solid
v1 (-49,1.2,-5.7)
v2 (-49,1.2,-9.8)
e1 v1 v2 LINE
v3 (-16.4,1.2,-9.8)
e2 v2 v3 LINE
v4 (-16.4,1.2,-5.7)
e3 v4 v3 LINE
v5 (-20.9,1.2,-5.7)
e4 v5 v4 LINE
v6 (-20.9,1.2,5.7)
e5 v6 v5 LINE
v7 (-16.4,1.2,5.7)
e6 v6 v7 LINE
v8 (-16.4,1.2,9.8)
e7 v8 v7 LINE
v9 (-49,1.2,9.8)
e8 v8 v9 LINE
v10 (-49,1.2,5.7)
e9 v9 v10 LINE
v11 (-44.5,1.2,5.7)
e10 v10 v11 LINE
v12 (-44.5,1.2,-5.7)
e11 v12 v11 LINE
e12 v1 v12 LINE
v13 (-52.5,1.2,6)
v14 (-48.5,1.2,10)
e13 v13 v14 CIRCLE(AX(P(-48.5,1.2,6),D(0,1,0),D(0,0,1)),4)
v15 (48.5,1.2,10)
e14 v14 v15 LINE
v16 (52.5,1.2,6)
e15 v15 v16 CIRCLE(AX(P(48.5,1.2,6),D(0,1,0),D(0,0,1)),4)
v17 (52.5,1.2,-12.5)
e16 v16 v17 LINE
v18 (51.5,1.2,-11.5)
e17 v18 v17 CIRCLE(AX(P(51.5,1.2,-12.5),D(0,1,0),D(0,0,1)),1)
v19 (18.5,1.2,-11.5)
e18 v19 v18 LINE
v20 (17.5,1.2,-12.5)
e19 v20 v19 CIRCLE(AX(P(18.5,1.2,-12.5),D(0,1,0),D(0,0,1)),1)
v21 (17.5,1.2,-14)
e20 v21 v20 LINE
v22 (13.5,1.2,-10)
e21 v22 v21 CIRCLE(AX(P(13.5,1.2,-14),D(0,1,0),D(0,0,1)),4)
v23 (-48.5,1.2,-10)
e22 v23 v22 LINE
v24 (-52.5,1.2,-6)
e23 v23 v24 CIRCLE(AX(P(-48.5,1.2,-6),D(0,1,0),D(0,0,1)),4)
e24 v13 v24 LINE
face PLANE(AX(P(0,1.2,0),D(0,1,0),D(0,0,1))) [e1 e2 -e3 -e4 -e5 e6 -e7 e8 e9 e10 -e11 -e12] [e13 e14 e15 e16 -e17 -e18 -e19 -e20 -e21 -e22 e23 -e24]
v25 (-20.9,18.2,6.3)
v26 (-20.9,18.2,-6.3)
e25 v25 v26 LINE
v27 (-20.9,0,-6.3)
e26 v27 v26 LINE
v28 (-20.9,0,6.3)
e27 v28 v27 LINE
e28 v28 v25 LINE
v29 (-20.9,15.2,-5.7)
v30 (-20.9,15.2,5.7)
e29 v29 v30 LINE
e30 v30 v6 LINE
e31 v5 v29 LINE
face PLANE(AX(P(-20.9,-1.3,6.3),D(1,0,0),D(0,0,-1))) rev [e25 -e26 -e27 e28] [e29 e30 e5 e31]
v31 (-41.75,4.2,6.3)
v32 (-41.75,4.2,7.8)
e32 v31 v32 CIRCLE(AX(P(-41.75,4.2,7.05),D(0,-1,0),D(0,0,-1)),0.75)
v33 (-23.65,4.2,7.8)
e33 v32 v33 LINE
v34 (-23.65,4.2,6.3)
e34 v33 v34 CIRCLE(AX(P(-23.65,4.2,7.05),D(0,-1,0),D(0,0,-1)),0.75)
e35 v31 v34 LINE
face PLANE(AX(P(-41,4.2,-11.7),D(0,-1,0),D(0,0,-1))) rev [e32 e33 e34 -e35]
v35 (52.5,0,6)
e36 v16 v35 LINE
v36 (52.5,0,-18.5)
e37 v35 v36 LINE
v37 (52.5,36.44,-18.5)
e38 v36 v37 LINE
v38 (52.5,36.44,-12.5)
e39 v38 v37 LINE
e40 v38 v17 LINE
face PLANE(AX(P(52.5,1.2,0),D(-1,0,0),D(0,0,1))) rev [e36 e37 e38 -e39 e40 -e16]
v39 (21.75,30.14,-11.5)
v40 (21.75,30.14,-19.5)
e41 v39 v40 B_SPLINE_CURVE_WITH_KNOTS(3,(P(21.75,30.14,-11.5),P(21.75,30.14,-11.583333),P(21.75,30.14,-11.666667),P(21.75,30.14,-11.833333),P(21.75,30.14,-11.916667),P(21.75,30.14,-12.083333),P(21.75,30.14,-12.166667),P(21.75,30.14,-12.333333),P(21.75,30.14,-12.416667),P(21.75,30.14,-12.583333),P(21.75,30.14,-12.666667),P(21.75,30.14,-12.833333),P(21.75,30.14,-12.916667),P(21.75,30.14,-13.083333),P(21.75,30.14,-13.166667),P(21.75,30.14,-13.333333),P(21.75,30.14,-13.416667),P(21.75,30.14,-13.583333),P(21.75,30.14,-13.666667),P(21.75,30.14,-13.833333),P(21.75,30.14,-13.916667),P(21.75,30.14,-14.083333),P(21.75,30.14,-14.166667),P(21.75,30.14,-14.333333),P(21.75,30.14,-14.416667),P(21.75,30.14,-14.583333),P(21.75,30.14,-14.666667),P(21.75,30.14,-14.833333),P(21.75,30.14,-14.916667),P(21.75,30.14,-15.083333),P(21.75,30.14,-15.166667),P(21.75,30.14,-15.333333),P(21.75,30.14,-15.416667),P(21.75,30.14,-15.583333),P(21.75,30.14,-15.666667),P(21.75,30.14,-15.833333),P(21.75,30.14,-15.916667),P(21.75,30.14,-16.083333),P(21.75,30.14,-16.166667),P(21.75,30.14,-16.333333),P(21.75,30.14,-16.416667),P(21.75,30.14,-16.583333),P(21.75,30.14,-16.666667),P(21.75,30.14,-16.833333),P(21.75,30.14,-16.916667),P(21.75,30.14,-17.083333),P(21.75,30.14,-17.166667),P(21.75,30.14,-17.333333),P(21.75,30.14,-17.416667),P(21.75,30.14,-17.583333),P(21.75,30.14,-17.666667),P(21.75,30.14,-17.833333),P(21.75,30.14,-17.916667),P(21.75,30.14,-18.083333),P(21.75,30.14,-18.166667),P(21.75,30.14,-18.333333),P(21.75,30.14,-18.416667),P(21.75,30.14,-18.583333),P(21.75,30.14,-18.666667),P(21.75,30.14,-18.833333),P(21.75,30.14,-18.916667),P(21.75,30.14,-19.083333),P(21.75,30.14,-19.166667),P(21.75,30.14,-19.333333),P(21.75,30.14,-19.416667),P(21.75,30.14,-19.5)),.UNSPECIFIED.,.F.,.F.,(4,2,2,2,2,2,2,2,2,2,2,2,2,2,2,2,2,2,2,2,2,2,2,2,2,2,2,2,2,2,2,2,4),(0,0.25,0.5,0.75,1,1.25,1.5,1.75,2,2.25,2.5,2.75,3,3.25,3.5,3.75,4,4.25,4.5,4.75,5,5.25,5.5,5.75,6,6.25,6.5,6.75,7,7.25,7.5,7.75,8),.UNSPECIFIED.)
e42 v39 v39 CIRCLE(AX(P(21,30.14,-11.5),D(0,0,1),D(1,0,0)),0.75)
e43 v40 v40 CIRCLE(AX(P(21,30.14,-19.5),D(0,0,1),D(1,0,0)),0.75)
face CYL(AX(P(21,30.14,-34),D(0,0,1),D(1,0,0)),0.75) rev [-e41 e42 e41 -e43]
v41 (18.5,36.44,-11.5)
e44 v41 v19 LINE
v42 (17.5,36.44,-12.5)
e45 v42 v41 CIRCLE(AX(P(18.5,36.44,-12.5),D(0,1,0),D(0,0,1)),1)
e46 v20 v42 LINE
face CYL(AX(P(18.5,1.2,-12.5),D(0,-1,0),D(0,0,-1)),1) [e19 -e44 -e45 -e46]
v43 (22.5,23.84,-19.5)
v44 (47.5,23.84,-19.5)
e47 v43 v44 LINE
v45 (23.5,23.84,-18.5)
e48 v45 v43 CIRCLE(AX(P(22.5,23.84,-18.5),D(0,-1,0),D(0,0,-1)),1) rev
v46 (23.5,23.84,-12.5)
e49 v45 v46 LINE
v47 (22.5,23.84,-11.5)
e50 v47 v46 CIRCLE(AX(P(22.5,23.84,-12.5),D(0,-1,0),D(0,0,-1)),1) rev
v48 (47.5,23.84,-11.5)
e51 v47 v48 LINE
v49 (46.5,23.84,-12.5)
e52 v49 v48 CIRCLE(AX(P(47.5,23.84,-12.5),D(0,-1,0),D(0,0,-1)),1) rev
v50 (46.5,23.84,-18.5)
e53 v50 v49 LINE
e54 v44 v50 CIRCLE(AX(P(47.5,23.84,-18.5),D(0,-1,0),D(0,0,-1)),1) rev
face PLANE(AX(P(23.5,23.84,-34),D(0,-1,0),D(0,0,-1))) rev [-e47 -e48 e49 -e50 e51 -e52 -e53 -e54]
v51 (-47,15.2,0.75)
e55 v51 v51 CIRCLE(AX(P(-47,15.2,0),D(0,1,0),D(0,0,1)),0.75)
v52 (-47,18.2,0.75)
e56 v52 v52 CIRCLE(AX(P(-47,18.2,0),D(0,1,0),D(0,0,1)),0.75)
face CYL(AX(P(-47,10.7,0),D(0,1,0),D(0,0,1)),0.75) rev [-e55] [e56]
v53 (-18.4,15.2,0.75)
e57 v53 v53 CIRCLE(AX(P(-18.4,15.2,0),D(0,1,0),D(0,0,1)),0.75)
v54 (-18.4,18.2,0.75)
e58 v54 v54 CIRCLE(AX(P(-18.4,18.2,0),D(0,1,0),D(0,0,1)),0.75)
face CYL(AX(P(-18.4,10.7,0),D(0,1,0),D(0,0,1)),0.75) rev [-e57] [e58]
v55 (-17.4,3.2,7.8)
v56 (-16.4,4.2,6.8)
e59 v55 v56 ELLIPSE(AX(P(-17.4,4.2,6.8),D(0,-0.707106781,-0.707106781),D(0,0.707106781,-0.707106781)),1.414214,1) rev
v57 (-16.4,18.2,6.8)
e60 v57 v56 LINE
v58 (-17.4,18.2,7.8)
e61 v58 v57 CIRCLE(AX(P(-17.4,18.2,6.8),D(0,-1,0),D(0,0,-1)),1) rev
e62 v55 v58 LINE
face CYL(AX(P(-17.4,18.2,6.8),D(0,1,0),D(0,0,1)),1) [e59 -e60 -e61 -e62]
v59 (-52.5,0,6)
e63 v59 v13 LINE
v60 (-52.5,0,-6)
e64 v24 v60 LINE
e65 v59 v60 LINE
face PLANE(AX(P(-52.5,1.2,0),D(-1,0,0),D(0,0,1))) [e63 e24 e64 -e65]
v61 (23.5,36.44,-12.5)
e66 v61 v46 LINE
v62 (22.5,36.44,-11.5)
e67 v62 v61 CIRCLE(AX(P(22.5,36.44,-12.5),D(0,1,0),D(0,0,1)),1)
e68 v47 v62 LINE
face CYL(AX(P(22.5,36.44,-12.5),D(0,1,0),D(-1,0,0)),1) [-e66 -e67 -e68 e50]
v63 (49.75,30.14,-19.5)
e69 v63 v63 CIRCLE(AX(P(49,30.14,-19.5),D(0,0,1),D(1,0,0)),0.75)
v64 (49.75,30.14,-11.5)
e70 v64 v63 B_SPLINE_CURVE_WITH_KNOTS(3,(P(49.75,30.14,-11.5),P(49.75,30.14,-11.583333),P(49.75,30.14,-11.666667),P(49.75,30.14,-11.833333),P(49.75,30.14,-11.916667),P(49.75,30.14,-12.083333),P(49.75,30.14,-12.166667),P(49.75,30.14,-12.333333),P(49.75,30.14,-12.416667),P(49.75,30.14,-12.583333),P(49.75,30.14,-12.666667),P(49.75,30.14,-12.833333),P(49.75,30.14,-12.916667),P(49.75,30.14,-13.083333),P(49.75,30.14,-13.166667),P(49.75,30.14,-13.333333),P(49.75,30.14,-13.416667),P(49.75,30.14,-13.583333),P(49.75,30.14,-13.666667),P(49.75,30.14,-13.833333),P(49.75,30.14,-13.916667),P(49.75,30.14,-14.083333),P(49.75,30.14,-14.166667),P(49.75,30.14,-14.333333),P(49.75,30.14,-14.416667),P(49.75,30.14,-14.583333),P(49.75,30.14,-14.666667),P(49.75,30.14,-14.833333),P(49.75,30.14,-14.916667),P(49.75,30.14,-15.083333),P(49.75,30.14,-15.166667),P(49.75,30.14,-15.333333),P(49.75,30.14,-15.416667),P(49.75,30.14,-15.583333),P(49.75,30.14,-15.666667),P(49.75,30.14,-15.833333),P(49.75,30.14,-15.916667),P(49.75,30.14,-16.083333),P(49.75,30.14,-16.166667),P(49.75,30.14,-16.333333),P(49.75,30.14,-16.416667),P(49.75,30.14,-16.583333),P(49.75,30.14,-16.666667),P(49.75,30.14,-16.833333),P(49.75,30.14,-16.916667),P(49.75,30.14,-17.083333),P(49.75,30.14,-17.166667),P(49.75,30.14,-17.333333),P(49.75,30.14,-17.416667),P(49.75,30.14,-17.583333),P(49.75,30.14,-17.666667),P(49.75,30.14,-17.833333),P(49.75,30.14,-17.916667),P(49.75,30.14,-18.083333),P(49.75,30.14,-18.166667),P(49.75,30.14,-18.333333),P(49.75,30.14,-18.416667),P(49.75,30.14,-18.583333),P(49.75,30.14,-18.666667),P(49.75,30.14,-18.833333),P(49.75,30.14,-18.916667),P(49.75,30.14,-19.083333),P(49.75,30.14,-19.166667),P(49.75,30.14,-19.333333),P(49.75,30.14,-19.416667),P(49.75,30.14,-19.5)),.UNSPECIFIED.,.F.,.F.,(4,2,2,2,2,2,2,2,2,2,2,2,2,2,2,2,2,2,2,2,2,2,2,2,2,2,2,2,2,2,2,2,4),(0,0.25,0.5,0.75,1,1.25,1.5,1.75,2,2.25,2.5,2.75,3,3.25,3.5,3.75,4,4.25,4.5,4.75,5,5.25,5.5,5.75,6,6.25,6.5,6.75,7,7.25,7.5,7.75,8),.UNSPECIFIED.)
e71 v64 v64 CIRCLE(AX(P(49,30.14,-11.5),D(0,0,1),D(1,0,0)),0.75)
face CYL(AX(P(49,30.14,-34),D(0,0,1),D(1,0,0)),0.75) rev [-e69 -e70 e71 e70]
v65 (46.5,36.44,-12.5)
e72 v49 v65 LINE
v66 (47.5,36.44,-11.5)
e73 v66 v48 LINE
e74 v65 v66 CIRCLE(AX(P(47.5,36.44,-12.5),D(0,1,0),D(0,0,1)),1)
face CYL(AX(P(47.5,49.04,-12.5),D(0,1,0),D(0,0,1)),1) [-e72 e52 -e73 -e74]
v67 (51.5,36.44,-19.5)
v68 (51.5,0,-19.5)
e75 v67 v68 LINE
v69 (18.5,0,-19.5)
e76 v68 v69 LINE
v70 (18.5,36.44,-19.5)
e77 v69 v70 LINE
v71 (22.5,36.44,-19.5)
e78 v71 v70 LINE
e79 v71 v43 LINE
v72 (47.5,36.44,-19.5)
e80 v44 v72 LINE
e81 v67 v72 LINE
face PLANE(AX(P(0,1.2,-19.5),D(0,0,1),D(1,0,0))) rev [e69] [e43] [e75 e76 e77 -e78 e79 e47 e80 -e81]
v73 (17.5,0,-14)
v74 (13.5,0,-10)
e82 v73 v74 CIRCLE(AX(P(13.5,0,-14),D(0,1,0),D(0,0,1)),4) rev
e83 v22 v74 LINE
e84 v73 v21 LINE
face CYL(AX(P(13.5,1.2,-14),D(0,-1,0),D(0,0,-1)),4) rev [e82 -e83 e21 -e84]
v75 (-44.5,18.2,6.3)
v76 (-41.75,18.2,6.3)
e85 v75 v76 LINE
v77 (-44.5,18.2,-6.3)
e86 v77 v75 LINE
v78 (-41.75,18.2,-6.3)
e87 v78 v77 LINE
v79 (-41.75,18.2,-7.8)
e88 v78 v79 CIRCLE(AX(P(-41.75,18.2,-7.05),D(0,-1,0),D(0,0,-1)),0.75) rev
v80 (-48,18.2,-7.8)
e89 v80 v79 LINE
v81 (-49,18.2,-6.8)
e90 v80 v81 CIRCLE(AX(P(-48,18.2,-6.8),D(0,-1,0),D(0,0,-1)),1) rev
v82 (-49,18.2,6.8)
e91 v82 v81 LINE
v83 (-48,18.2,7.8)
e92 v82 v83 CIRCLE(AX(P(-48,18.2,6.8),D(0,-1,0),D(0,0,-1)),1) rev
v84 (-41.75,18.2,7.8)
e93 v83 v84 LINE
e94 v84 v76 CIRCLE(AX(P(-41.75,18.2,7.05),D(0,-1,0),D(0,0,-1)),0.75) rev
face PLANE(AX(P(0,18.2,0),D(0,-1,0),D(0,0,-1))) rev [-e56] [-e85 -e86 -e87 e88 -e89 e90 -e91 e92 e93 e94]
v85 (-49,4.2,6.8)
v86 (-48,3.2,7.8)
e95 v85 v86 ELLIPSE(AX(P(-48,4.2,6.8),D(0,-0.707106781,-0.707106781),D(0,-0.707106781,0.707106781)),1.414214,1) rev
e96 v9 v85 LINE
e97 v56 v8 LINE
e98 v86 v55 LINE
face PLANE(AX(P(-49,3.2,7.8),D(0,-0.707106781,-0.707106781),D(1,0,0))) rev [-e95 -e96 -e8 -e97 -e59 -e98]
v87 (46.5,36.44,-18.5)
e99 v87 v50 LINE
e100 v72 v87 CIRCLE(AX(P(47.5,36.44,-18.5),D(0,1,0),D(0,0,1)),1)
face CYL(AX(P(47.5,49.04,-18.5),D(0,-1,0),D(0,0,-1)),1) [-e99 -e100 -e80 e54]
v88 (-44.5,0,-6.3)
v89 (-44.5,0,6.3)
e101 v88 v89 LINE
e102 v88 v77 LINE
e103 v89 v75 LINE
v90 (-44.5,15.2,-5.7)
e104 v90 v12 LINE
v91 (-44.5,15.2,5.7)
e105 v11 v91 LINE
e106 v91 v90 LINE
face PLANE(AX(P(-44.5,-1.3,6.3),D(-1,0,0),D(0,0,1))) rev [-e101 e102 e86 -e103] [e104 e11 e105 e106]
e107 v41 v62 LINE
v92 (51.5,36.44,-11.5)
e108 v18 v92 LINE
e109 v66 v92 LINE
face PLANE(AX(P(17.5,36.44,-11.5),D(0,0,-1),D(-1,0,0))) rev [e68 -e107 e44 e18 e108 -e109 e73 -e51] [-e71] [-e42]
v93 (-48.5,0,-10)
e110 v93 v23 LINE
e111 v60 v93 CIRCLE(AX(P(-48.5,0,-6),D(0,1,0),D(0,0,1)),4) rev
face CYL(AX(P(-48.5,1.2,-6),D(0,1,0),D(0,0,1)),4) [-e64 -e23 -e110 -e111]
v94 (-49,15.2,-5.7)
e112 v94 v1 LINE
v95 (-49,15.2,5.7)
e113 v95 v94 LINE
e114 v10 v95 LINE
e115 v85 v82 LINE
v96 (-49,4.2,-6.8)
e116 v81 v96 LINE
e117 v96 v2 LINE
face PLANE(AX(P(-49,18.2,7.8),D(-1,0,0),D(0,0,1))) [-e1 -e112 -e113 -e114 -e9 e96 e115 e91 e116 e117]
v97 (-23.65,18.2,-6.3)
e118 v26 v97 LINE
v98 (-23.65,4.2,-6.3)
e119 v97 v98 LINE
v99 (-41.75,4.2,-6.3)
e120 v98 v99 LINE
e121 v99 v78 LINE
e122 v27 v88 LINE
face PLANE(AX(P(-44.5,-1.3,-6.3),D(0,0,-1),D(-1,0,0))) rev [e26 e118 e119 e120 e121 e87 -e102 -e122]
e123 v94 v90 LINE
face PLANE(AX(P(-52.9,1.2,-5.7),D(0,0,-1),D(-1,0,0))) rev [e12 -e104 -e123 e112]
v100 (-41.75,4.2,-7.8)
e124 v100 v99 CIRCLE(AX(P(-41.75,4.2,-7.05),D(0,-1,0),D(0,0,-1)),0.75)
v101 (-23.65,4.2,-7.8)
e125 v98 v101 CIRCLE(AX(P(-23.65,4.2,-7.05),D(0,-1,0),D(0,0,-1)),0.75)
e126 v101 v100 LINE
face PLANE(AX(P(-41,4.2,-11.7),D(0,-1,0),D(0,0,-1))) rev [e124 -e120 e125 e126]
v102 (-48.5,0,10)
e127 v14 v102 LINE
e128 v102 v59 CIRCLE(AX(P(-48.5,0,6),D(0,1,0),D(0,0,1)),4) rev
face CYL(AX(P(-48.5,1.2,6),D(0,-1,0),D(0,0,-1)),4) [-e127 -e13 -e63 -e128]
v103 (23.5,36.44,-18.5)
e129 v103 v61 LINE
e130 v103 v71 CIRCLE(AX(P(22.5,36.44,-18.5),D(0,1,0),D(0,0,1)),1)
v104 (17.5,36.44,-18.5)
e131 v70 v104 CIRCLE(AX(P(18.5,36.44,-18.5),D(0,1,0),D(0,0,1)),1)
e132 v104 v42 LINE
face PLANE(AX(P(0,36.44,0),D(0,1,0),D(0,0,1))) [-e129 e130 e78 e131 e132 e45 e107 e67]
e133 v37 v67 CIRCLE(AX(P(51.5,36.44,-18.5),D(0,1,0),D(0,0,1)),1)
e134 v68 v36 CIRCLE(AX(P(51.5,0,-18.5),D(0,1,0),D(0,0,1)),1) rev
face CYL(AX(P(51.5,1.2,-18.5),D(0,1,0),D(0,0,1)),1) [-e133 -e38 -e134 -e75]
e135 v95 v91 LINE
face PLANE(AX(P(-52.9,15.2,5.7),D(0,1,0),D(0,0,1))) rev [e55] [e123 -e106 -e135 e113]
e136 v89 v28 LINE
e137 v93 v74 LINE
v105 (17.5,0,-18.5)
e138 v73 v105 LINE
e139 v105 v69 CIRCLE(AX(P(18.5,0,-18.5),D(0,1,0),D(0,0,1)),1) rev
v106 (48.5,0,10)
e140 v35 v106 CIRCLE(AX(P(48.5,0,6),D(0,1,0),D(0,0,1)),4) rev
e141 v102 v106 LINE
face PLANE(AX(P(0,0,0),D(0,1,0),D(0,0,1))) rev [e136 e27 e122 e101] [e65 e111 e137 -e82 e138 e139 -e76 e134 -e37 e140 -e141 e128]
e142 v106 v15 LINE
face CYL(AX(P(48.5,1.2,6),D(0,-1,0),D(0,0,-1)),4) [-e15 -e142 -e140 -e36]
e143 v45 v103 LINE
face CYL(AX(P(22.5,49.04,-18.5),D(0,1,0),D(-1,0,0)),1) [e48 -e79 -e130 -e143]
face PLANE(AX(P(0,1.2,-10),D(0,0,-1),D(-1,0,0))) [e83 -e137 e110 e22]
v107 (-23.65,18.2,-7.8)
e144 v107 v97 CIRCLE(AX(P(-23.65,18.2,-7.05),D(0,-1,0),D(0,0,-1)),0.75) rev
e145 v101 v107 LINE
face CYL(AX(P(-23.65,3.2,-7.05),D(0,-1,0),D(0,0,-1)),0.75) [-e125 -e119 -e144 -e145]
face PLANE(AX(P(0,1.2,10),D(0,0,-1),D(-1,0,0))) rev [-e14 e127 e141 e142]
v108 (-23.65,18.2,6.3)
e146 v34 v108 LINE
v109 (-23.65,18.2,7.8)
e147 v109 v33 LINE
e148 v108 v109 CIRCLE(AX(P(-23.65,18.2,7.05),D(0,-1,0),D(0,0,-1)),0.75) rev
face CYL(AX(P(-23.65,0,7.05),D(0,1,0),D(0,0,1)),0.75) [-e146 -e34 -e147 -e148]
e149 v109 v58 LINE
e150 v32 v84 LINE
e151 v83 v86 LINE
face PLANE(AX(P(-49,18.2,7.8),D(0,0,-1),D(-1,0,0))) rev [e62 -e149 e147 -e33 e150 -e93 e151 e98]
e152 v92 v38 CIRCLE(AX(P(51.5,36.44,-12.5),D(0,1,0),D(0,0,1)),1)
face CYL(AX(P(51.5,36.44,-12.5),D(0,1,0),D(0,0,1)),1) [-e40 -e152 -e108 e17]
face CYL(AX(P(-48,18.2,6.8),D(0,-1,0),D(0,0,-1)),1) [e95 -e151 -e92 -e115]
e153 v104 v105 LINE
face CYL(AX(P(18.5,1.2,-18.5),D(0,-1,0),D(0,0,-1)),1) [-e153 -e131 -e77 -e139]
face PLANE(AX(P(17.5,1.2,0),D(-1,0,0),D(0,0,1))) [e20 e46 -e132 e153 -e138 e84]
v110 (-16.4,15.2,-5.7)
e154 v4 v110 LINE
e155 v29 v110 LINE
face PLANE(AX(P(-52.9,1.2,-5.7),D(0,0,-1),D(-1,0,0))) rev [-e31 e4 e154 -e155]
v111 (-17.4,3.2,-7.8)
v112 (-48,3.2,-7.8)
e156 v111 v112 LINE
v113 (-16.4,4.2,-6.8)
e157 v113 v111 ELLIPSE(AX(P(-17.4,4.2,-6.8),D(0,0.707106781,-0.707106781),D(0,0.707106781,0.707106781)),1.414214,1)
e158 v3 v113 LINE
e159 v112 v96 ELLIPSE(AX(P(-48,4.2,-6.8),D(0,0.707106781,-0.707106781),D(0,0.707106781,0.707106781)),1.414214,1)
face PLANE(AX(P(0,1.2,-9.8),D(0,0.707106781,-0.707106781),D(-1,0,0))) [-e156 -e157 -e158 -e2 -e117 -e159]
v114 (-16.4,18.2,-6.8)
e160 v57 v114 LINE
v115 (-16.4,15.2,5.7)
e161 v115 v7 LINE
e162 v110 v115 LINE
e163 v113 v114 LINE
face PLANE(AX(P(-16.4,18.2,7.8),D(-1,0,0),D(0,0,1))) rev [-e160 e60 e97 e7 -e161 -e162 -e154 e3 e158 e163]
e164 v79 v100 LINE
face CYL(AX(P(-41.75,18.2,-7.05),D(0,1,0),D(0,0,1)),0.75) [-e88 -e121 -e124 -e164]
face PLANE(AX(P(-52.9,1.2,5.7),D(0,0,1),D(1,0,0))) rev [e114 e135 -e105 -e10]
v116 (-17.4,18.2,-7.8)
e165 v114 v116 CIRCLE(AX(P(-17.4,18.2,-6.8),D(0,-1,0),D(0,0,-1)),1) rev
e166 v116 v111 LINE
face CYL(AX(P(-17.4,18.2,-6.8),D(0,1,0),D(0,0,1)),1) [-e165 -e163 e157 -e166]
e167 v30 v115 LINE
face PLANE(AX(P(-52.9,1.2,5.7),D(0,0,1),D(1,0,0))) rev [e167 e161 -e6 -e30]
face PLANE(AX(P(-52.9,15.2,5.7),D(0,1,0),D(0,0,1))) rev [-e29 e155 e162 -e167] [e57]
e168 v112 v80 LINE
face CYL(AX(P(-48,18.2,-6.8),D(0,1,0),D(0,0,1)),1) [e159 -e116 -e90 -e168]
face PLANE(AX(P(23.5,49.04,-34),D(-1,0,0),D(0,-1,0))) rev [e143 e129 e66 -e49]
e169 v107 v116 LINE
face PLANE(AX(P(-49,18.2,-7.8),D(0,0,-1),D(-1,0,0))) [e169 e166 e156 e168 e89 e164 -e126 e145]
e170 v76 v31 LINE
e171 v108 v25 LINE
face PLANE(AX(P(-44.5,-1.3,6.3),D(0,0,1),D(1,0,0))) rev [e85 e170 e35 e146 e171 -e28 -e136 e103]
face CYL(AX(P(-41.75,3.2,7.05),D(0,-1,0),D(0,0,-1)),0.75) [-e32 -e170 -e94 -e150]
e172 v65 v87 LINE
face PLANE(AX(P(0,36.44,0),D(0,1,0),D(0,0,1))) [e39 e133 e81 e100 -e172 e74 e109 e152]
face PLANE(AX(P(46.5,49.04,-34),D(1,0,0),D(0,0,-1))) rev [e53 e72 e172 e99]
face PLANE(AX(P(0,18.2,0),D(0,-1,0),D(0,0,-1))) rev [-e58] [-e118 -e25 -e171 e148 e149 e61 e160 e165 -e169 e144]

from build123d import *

# Parameters (mm, degrees)
ESBO_O1_W                = 35
ESBO_O1_H                = 9.5
ESBO_O1_W_2              = 105
ESBO_O1_H_2              = 20
BASE_DEPTH               = 1.2
ESBO_O2_W                = 32.6
ESBO_O2_H                = 15.6
SUPORTE_1_DEPTH          = 17
ESBO_O3_W                = 23.6
ESBO_O3_H                = 12.6
CORTE_EXTRUS_O1_DEPTH    = 19.5
ESBO_O4_W                = 16.6
ESBO_O4_H                = 17.237895569
CORTE_EXTRUS_O2_DEPTH    = 19.5
ESBO_O5_W                = 11.4
ESBO_O5_H                = 14
CORTE_EXTRUS_O3_DEPTH    = 36.5
ESBO_O6_R                = 0.75
CORTE_EXTRUS_O4_DEPTH    = 7.5
ESBO_O7_W                = 35
ESBO_O7_H                = 8
RESSALTO_EXTRUS_O3_DEPTH = 35.24
ESBO_O9_W                = 23
ESBO_O9_H                = 25.2
CORTE_EXTRUS_O5_DEPTH    = 22.5
ESBO_O10_R               = 0.75
CORTE_EXTRUS_O6_DEPTH    = 22.5
CHANFRO1_SIZE            = 2
CHANFRO2_SIZE            = 2
FILETE1_R                = 1
FILETE2_R                = 1
FILETE3_R                = 1
FILETE4_R                = 1
FILETE5_R                = 1
FILETE6_R                = 1
FILETE7_R                = 1
FILETE8_R                = 1
FILETE9_RADIUS           = 0.75
FILETE9_LENGTH           = 14
FILETE10_RADIUS          = 0.75
FILETE10_LENGTH          = 14
FILETE11_RADIUS          = 0.75
FILETE11_LENGTH          = 14
FILETE12_RADIUS          = 0.75
FILETE12_LENGTH          = 14
FILETE13_R               = 1
FILETE14_R               = 1
FILETE15_R               = 1
FILETE16_R               = 1
FILETE17_R               = 4
FILETE18_R               = 4
FILETE19_R               = 4
FILETE20_R               = 4


with BuildPart() as part:
    # Esboço1 → Base (new body)
    with BuildSketch(Plane(origin=(0, 0, 0), x_dir=(1, 0, 0), z_dir=(0, 1, 0))):
        with Locations((35, 14.75)):
            Rectangle(ESBO_O1_W, ESBO_O1_H)
        Rectangle(ESBO_O1_W_2, ESBO_O1_H_2)
    extrude(amount=BASE_DEPTH)

    # Esboço2 → Suporte 1 (add)
    with BuildSketch(Plane(origin=(0, 1.2, 0), x_dir=(1, 0, 0), z_dir=(0, 1, 0))):
        with Locations((-32.7, 0)):
            Rectangle(ESBO_O2_W, ESBO_O2_H)
    extrude(amount=SUPORTE_1_DEPTH)

    # Esboço3 → Corte-extrusão1 (cut)
    with BuildSketch(Plane(origin=(0, 18.2, 0), x_dir=(1, 0, 0), z_dir=(0, 1, 0))):
        with Locations((-32.7, 0)):
            Rectangle(ESBO_O3_W, ESBO_O3_H)
    extrude(amount=-CORTE_EXTRUS_O1_DEPTH, mode=Mode.SUBTRACT)

    # Esboço4 → Corte-extrusão2 (cut)
    with BuildSketch(Plane.XY.offset(7.8)):
        with Locations((-32.7, 12.818947785)):
            Rectangle(ESBO_O4_W, ESBO_O4_H)
    extrude(amount=-CORTE_EXTRUS_O2_DEPTH, mode=Mode.SUBTRACT)

    # Esboço5 → Corte-extrusão3 (cut)
    with BuildSketch(Plane(origin=(-16.4, 0, 0), x_dir=(0, 0, -1), z_dir=(1, 0, 0))):
        with Locations((0, 8.2)):
            Rectangle(ESBO_O5_W, ESBO_O5_H)
    extrude(amount=-CORTE_EXTRUS_O3_DEPTH, mode=Mode.SUBTRACT)

    # Esboço6 → Corte-extrusão4 (cut)
    with BuildSketch(Plane(origin=(0, 18.2, 0), x_dir=(1, 0, 0), z_dir=(0, 1, 0))):
        with Locations(Location((-47, 0, 0), (0, 0, 270))):
            Circle(ESBO_O6_R)
        with Locations(Location((-18.4, 0, 0), (0, 0, 270))):
            Circle(ESBO_O6_R)
    extrude(amount=-CORTE_EXTRUS_O4_DEPTH, mode=Mode.SUBTRACT)

    # Esboço7 → Ressalto-extrusão3 (add)
    with BuildSketch(Plane(origin=(0, 1.2, 0), x_dir=(1, 0, 0), z_dir=(0, 1, 0))):
        with Locations((35, 15.5)):
            Rectangle(ESBO_O7_W, ESBO_O7_H)
    extrude(amount=RESSALTO_EXTRUS_O3_DEPTH)

    # Esboço9 → Corte-extrusão5 (cut)
    with BuildSketch(Plane.XY.offset(-11.5)):
        with Locations((35, 36.44)):
            Rectangle(ESBO_O9_W, ESBO_O9_H)
    extrude(amount=-CORTE_EXTRUS_O5_DEPTH, mode=Mode.SUBTRACT)

    # Esboço10 → Corte-extrusão6 (cut)
    with BuildSketch(Plane.XY.offset(-11.5)):
        with Locations((21, 30.14)):
            Circle(ESBO_O10_R)
        with Locations((49, 30.14)):
            Circle(ESBO_O10_R)
    extrude(amount=-CORTE_EXTRUS_O6_DEPTH, mode=Mode.SUBTRACT)

    # Chanfro1
    chanfro1_edges = [part.edges().sort_by_distance(p)[0] for p in [
        (-32.7, 1.2, 7.8),
    ]]
    chamfer(chanfro1_edges, length=CHANFRO1_SIZE)

    # Chanfro2
    chanfro2_edges = [part.edges().sort_by_distance(p)[0] for p in [
        (-32.7, 1.2, -7.8),
    ]]
    chamfer(chanfro2_edges, length=CHANFRO2_SIZE)

    # Filete1
    filete1_edges = [part.edges().sort_by_distance(p)[0] for p in [
        (52.5, 18.22, -19.5),
    ]]
    fillet(filete1_edges, radius=FILETE1_R)

    # Filete2
    filete2_edges = [part.edges().sort_by_distance(p)[0] for p in [
        (17.5, 18.22, -19.5),
    ]]
    fillet(filete2_edges, radius=FILETE2_R)

    # Filete3
    filete3_edges = [part.edges().sort_by_distance(p)[0] for p in [
        (23.5, 30.14, -19.5),
    ]]
    fillet(filete3_edges, radius=FILETE3_R)

    # Filete4
    filete4_edges = [part.edges().sort_by_distance(p)[0] for p in [
        (46.5, 30.14, -19.5),
    ]]
    fillet(filete4_edges, radius=FILETE4_R)

    # Filete5
    filete5_edges = [part.edges().sort_by_distance(p)[0] for p in [
        (52.5, 18.82, -11.5),
    ]]
    fillet(filete5_edges, radius=FILETE5_R)

    # Filete6
    filete6_edges = [part.edges().sort_by_distance(p)[0] for p in [
        (17.5, 18.82, -11.5),
    ]]
    fillet(filete6_edges, radius=FILETE6_R)

    # Filete7
    filete7_edges = [part.edges().sort_by_distance(p)[0] for p in [
        (46.5, 30.14, -11.5),
    ]]
    fillet(filete7_edges, radius=FILETE7_R)

    # Filete8
    filete8_edges = [part.edges().sort_by_distance(p)[0] for p in [
        (23.5, 30.14, -11.5),
    ]]
    fillet(filete8_edges, radius=FILETE8_R)

    # Filete9: full round fillet: the end face becomes a half cylinder, R = half its width
    filete9_face = Plane((-41, 11.2, 7.05), x_dir=(0, -1, 0), z_dir=(1, 0, 0))  # on the end face: x along it, z out of the body
    filete9_slab = filete9_face.offset(-FILETE9_RADIUS / 2) * Box(FILETE9_LENGTH, 2 * FILETE9_RADIUS, FILETE9_RADIUS, mode=Mode.PRIVATE)  # the body's end, R deep
    filete9_round = Plane((-41.75, 11.2, 7.05), x_dir=(1, 0, 0), z_dir=(0, -1, 0)) * Cylinder(FILETE9_RADIUS, FILETE9_LENGTH, mode=Mode.PRIVATE)  # its axis R under the face
    add(filete9_slab - filete9_round, mode=Mode.SUBTRACT)

    # Filete10: full round fillet: the end face becomes a half cylinder, R = half its width
    filete10_face = Plane((-41, 11.2, -7.05), x_dir=(0, -1, 0), z_dir=(1, 0, 0))  # on the end face: x along it, z out of the body
    filete10_slab = filete10_face.offset(-FILETE10_RADIUS / 2) * Box(FILETE10_LENGTH, 2 * FILETE10_RADIUS, FILETE10_RADIUS, mode=Mode.PRIVATE)  # the body's end, R deep
    filete10_round = Plane((-41.75, 11.2, -7.05), x_dir=(1, 0, 0), z_dir=(0, -1, 0)) * Cylinder(FILETE10_RADIUS, FILETE10_LENGTH, mode=Mode.PRIVATE)  # its axis R under the face
    add(filete10_slab - filete10_round, mode=Mode.SUBTRACT)

    # Filete11: full round fillet: the end face becomes a half cylinder, R = half its width
    filete11_face = Plane((-24.4, 11.2, 7.05), x_dir=(0, 1, 0), z_dir=(-1, 0, 0))  # on the end face: x along it, z out of the body
    filete11_slab = filete11_face.offset(-FILETE11_RADIUS / 2) * Box(FILETE11_LENGTH, 2 * FILETE11_RADIUS, FILETE11_RADIUS, mode=Mode.PRIVATE)  # the body's end, R deep
    filete11_round = Plane((-23.65, 11.2, 7.05), x_dir=(-1, 0, 0), z_dir=(0, 1, 0)) * Cylinder(FILETE11_RADIUS, FILETE11_LENGTH, mode=Mode.PRIVATE)  # its axis R under the face
    add(filete11_slab - filete11_round, mode=Mode.SUBTRACT)

    # Filete12: full round fillet: the end face becomes a half cylinder, R = half its width
    filete12_face = Plane((-24.4, 11.2, -7.05), x_dir=(0, 1, 0), z_dir=(-1, 0, 0))  # on the end face: x along it, z out of the body
    filete12_slab = filete12_face.offset(-FILETE12_RADIUS / 2) * Box(FILETE12_LENGTH, 2 * FILETE12_RADIUS, FILETE12_RADIUS, mode=Mode.PRIVATE)  # the body's end, R deep
    filete12_round = Plane((-23.65, 11.2, -7.05), x_dir=(-1, 0, 0), z_dir=(0, 1, 0)) * Cylinder(FILETE12_RADIUS, FILETE12_LENGTH, mode=Mode.PRIVATE)  # its axis R under the face
    add(filete12_slab - filete12_round, mode=Mode.SUBTRACT)

    # Filete13
    filete13_edges = [part.edges().sort_by_distance(p)[0] for p in [
        (-49, 10.7, -7.8),
    ]]
    fillet(filete13_edges, radius=FILETE13_R)

    # Filete14
    filete14_edges = [part.edges().sort_by_distance(p)[0] for p in [
        (-49, 10.7, 7.8),
    ]]
    fillet(filete14_edges, radius=FILETE14_R)

    # Filete15
    filete15_edges = [part.edges().sort_by_distance(p)[0] for p in [
        (-16.4, 10.7, 7.8),
    ]]
    fillet(filete15_edges, radius=FILETE15_R)

    # Filete16
    filete16_edges = [part.edges().sort_by_distance(p)[0] for p in [
        (-16.4, 10.7, -7.8),
    ]]
    fillet(filete16_edges, radius=FILETE16_R)

    # Filete17
    filete17_edges = [part.edges().sort_by_distance(p)[0] for p in [
        (-52.5, 0.6, 10),
    ]]
    fillet(filete17_edges, radius=FILETE17_R)

    # Filete18
    filete18_edges = [part.edges().sort_by_distance(p)[0] for p in [
        (-52.5, 0.6, -10),
    ]]
    fillet(filete18_edges, radius=FILETE18_R)

    # Filete19
    filete19_edges = [part.edges().sort_by_distance(p)[0] for p in [
        (52.5, 0.6, 10),
    ]]
    fillet(filete19_edges, radius=FILETE19_R)

    # Filete20
    # the kernel refuses this fillet: 4 mm, written as the material it adds along each edge
    with BuildSketch(Plane(origin=(17.5, 0, -10), x_dir=(-1, 0, 0), z_dir=(0, 1, 0))) as filete20_piece_1:
        with BuildLine():
            CenterArc((FILETE20_R, -FILETE20_R), FILETE20_R, 90, 90)
            Line((0, -FILETE20_R), (0, 0))
            Line((0, 0), (FILETE20_R, 0))
        make_face()
    extrude(amount=1.2)


solid = part.part
